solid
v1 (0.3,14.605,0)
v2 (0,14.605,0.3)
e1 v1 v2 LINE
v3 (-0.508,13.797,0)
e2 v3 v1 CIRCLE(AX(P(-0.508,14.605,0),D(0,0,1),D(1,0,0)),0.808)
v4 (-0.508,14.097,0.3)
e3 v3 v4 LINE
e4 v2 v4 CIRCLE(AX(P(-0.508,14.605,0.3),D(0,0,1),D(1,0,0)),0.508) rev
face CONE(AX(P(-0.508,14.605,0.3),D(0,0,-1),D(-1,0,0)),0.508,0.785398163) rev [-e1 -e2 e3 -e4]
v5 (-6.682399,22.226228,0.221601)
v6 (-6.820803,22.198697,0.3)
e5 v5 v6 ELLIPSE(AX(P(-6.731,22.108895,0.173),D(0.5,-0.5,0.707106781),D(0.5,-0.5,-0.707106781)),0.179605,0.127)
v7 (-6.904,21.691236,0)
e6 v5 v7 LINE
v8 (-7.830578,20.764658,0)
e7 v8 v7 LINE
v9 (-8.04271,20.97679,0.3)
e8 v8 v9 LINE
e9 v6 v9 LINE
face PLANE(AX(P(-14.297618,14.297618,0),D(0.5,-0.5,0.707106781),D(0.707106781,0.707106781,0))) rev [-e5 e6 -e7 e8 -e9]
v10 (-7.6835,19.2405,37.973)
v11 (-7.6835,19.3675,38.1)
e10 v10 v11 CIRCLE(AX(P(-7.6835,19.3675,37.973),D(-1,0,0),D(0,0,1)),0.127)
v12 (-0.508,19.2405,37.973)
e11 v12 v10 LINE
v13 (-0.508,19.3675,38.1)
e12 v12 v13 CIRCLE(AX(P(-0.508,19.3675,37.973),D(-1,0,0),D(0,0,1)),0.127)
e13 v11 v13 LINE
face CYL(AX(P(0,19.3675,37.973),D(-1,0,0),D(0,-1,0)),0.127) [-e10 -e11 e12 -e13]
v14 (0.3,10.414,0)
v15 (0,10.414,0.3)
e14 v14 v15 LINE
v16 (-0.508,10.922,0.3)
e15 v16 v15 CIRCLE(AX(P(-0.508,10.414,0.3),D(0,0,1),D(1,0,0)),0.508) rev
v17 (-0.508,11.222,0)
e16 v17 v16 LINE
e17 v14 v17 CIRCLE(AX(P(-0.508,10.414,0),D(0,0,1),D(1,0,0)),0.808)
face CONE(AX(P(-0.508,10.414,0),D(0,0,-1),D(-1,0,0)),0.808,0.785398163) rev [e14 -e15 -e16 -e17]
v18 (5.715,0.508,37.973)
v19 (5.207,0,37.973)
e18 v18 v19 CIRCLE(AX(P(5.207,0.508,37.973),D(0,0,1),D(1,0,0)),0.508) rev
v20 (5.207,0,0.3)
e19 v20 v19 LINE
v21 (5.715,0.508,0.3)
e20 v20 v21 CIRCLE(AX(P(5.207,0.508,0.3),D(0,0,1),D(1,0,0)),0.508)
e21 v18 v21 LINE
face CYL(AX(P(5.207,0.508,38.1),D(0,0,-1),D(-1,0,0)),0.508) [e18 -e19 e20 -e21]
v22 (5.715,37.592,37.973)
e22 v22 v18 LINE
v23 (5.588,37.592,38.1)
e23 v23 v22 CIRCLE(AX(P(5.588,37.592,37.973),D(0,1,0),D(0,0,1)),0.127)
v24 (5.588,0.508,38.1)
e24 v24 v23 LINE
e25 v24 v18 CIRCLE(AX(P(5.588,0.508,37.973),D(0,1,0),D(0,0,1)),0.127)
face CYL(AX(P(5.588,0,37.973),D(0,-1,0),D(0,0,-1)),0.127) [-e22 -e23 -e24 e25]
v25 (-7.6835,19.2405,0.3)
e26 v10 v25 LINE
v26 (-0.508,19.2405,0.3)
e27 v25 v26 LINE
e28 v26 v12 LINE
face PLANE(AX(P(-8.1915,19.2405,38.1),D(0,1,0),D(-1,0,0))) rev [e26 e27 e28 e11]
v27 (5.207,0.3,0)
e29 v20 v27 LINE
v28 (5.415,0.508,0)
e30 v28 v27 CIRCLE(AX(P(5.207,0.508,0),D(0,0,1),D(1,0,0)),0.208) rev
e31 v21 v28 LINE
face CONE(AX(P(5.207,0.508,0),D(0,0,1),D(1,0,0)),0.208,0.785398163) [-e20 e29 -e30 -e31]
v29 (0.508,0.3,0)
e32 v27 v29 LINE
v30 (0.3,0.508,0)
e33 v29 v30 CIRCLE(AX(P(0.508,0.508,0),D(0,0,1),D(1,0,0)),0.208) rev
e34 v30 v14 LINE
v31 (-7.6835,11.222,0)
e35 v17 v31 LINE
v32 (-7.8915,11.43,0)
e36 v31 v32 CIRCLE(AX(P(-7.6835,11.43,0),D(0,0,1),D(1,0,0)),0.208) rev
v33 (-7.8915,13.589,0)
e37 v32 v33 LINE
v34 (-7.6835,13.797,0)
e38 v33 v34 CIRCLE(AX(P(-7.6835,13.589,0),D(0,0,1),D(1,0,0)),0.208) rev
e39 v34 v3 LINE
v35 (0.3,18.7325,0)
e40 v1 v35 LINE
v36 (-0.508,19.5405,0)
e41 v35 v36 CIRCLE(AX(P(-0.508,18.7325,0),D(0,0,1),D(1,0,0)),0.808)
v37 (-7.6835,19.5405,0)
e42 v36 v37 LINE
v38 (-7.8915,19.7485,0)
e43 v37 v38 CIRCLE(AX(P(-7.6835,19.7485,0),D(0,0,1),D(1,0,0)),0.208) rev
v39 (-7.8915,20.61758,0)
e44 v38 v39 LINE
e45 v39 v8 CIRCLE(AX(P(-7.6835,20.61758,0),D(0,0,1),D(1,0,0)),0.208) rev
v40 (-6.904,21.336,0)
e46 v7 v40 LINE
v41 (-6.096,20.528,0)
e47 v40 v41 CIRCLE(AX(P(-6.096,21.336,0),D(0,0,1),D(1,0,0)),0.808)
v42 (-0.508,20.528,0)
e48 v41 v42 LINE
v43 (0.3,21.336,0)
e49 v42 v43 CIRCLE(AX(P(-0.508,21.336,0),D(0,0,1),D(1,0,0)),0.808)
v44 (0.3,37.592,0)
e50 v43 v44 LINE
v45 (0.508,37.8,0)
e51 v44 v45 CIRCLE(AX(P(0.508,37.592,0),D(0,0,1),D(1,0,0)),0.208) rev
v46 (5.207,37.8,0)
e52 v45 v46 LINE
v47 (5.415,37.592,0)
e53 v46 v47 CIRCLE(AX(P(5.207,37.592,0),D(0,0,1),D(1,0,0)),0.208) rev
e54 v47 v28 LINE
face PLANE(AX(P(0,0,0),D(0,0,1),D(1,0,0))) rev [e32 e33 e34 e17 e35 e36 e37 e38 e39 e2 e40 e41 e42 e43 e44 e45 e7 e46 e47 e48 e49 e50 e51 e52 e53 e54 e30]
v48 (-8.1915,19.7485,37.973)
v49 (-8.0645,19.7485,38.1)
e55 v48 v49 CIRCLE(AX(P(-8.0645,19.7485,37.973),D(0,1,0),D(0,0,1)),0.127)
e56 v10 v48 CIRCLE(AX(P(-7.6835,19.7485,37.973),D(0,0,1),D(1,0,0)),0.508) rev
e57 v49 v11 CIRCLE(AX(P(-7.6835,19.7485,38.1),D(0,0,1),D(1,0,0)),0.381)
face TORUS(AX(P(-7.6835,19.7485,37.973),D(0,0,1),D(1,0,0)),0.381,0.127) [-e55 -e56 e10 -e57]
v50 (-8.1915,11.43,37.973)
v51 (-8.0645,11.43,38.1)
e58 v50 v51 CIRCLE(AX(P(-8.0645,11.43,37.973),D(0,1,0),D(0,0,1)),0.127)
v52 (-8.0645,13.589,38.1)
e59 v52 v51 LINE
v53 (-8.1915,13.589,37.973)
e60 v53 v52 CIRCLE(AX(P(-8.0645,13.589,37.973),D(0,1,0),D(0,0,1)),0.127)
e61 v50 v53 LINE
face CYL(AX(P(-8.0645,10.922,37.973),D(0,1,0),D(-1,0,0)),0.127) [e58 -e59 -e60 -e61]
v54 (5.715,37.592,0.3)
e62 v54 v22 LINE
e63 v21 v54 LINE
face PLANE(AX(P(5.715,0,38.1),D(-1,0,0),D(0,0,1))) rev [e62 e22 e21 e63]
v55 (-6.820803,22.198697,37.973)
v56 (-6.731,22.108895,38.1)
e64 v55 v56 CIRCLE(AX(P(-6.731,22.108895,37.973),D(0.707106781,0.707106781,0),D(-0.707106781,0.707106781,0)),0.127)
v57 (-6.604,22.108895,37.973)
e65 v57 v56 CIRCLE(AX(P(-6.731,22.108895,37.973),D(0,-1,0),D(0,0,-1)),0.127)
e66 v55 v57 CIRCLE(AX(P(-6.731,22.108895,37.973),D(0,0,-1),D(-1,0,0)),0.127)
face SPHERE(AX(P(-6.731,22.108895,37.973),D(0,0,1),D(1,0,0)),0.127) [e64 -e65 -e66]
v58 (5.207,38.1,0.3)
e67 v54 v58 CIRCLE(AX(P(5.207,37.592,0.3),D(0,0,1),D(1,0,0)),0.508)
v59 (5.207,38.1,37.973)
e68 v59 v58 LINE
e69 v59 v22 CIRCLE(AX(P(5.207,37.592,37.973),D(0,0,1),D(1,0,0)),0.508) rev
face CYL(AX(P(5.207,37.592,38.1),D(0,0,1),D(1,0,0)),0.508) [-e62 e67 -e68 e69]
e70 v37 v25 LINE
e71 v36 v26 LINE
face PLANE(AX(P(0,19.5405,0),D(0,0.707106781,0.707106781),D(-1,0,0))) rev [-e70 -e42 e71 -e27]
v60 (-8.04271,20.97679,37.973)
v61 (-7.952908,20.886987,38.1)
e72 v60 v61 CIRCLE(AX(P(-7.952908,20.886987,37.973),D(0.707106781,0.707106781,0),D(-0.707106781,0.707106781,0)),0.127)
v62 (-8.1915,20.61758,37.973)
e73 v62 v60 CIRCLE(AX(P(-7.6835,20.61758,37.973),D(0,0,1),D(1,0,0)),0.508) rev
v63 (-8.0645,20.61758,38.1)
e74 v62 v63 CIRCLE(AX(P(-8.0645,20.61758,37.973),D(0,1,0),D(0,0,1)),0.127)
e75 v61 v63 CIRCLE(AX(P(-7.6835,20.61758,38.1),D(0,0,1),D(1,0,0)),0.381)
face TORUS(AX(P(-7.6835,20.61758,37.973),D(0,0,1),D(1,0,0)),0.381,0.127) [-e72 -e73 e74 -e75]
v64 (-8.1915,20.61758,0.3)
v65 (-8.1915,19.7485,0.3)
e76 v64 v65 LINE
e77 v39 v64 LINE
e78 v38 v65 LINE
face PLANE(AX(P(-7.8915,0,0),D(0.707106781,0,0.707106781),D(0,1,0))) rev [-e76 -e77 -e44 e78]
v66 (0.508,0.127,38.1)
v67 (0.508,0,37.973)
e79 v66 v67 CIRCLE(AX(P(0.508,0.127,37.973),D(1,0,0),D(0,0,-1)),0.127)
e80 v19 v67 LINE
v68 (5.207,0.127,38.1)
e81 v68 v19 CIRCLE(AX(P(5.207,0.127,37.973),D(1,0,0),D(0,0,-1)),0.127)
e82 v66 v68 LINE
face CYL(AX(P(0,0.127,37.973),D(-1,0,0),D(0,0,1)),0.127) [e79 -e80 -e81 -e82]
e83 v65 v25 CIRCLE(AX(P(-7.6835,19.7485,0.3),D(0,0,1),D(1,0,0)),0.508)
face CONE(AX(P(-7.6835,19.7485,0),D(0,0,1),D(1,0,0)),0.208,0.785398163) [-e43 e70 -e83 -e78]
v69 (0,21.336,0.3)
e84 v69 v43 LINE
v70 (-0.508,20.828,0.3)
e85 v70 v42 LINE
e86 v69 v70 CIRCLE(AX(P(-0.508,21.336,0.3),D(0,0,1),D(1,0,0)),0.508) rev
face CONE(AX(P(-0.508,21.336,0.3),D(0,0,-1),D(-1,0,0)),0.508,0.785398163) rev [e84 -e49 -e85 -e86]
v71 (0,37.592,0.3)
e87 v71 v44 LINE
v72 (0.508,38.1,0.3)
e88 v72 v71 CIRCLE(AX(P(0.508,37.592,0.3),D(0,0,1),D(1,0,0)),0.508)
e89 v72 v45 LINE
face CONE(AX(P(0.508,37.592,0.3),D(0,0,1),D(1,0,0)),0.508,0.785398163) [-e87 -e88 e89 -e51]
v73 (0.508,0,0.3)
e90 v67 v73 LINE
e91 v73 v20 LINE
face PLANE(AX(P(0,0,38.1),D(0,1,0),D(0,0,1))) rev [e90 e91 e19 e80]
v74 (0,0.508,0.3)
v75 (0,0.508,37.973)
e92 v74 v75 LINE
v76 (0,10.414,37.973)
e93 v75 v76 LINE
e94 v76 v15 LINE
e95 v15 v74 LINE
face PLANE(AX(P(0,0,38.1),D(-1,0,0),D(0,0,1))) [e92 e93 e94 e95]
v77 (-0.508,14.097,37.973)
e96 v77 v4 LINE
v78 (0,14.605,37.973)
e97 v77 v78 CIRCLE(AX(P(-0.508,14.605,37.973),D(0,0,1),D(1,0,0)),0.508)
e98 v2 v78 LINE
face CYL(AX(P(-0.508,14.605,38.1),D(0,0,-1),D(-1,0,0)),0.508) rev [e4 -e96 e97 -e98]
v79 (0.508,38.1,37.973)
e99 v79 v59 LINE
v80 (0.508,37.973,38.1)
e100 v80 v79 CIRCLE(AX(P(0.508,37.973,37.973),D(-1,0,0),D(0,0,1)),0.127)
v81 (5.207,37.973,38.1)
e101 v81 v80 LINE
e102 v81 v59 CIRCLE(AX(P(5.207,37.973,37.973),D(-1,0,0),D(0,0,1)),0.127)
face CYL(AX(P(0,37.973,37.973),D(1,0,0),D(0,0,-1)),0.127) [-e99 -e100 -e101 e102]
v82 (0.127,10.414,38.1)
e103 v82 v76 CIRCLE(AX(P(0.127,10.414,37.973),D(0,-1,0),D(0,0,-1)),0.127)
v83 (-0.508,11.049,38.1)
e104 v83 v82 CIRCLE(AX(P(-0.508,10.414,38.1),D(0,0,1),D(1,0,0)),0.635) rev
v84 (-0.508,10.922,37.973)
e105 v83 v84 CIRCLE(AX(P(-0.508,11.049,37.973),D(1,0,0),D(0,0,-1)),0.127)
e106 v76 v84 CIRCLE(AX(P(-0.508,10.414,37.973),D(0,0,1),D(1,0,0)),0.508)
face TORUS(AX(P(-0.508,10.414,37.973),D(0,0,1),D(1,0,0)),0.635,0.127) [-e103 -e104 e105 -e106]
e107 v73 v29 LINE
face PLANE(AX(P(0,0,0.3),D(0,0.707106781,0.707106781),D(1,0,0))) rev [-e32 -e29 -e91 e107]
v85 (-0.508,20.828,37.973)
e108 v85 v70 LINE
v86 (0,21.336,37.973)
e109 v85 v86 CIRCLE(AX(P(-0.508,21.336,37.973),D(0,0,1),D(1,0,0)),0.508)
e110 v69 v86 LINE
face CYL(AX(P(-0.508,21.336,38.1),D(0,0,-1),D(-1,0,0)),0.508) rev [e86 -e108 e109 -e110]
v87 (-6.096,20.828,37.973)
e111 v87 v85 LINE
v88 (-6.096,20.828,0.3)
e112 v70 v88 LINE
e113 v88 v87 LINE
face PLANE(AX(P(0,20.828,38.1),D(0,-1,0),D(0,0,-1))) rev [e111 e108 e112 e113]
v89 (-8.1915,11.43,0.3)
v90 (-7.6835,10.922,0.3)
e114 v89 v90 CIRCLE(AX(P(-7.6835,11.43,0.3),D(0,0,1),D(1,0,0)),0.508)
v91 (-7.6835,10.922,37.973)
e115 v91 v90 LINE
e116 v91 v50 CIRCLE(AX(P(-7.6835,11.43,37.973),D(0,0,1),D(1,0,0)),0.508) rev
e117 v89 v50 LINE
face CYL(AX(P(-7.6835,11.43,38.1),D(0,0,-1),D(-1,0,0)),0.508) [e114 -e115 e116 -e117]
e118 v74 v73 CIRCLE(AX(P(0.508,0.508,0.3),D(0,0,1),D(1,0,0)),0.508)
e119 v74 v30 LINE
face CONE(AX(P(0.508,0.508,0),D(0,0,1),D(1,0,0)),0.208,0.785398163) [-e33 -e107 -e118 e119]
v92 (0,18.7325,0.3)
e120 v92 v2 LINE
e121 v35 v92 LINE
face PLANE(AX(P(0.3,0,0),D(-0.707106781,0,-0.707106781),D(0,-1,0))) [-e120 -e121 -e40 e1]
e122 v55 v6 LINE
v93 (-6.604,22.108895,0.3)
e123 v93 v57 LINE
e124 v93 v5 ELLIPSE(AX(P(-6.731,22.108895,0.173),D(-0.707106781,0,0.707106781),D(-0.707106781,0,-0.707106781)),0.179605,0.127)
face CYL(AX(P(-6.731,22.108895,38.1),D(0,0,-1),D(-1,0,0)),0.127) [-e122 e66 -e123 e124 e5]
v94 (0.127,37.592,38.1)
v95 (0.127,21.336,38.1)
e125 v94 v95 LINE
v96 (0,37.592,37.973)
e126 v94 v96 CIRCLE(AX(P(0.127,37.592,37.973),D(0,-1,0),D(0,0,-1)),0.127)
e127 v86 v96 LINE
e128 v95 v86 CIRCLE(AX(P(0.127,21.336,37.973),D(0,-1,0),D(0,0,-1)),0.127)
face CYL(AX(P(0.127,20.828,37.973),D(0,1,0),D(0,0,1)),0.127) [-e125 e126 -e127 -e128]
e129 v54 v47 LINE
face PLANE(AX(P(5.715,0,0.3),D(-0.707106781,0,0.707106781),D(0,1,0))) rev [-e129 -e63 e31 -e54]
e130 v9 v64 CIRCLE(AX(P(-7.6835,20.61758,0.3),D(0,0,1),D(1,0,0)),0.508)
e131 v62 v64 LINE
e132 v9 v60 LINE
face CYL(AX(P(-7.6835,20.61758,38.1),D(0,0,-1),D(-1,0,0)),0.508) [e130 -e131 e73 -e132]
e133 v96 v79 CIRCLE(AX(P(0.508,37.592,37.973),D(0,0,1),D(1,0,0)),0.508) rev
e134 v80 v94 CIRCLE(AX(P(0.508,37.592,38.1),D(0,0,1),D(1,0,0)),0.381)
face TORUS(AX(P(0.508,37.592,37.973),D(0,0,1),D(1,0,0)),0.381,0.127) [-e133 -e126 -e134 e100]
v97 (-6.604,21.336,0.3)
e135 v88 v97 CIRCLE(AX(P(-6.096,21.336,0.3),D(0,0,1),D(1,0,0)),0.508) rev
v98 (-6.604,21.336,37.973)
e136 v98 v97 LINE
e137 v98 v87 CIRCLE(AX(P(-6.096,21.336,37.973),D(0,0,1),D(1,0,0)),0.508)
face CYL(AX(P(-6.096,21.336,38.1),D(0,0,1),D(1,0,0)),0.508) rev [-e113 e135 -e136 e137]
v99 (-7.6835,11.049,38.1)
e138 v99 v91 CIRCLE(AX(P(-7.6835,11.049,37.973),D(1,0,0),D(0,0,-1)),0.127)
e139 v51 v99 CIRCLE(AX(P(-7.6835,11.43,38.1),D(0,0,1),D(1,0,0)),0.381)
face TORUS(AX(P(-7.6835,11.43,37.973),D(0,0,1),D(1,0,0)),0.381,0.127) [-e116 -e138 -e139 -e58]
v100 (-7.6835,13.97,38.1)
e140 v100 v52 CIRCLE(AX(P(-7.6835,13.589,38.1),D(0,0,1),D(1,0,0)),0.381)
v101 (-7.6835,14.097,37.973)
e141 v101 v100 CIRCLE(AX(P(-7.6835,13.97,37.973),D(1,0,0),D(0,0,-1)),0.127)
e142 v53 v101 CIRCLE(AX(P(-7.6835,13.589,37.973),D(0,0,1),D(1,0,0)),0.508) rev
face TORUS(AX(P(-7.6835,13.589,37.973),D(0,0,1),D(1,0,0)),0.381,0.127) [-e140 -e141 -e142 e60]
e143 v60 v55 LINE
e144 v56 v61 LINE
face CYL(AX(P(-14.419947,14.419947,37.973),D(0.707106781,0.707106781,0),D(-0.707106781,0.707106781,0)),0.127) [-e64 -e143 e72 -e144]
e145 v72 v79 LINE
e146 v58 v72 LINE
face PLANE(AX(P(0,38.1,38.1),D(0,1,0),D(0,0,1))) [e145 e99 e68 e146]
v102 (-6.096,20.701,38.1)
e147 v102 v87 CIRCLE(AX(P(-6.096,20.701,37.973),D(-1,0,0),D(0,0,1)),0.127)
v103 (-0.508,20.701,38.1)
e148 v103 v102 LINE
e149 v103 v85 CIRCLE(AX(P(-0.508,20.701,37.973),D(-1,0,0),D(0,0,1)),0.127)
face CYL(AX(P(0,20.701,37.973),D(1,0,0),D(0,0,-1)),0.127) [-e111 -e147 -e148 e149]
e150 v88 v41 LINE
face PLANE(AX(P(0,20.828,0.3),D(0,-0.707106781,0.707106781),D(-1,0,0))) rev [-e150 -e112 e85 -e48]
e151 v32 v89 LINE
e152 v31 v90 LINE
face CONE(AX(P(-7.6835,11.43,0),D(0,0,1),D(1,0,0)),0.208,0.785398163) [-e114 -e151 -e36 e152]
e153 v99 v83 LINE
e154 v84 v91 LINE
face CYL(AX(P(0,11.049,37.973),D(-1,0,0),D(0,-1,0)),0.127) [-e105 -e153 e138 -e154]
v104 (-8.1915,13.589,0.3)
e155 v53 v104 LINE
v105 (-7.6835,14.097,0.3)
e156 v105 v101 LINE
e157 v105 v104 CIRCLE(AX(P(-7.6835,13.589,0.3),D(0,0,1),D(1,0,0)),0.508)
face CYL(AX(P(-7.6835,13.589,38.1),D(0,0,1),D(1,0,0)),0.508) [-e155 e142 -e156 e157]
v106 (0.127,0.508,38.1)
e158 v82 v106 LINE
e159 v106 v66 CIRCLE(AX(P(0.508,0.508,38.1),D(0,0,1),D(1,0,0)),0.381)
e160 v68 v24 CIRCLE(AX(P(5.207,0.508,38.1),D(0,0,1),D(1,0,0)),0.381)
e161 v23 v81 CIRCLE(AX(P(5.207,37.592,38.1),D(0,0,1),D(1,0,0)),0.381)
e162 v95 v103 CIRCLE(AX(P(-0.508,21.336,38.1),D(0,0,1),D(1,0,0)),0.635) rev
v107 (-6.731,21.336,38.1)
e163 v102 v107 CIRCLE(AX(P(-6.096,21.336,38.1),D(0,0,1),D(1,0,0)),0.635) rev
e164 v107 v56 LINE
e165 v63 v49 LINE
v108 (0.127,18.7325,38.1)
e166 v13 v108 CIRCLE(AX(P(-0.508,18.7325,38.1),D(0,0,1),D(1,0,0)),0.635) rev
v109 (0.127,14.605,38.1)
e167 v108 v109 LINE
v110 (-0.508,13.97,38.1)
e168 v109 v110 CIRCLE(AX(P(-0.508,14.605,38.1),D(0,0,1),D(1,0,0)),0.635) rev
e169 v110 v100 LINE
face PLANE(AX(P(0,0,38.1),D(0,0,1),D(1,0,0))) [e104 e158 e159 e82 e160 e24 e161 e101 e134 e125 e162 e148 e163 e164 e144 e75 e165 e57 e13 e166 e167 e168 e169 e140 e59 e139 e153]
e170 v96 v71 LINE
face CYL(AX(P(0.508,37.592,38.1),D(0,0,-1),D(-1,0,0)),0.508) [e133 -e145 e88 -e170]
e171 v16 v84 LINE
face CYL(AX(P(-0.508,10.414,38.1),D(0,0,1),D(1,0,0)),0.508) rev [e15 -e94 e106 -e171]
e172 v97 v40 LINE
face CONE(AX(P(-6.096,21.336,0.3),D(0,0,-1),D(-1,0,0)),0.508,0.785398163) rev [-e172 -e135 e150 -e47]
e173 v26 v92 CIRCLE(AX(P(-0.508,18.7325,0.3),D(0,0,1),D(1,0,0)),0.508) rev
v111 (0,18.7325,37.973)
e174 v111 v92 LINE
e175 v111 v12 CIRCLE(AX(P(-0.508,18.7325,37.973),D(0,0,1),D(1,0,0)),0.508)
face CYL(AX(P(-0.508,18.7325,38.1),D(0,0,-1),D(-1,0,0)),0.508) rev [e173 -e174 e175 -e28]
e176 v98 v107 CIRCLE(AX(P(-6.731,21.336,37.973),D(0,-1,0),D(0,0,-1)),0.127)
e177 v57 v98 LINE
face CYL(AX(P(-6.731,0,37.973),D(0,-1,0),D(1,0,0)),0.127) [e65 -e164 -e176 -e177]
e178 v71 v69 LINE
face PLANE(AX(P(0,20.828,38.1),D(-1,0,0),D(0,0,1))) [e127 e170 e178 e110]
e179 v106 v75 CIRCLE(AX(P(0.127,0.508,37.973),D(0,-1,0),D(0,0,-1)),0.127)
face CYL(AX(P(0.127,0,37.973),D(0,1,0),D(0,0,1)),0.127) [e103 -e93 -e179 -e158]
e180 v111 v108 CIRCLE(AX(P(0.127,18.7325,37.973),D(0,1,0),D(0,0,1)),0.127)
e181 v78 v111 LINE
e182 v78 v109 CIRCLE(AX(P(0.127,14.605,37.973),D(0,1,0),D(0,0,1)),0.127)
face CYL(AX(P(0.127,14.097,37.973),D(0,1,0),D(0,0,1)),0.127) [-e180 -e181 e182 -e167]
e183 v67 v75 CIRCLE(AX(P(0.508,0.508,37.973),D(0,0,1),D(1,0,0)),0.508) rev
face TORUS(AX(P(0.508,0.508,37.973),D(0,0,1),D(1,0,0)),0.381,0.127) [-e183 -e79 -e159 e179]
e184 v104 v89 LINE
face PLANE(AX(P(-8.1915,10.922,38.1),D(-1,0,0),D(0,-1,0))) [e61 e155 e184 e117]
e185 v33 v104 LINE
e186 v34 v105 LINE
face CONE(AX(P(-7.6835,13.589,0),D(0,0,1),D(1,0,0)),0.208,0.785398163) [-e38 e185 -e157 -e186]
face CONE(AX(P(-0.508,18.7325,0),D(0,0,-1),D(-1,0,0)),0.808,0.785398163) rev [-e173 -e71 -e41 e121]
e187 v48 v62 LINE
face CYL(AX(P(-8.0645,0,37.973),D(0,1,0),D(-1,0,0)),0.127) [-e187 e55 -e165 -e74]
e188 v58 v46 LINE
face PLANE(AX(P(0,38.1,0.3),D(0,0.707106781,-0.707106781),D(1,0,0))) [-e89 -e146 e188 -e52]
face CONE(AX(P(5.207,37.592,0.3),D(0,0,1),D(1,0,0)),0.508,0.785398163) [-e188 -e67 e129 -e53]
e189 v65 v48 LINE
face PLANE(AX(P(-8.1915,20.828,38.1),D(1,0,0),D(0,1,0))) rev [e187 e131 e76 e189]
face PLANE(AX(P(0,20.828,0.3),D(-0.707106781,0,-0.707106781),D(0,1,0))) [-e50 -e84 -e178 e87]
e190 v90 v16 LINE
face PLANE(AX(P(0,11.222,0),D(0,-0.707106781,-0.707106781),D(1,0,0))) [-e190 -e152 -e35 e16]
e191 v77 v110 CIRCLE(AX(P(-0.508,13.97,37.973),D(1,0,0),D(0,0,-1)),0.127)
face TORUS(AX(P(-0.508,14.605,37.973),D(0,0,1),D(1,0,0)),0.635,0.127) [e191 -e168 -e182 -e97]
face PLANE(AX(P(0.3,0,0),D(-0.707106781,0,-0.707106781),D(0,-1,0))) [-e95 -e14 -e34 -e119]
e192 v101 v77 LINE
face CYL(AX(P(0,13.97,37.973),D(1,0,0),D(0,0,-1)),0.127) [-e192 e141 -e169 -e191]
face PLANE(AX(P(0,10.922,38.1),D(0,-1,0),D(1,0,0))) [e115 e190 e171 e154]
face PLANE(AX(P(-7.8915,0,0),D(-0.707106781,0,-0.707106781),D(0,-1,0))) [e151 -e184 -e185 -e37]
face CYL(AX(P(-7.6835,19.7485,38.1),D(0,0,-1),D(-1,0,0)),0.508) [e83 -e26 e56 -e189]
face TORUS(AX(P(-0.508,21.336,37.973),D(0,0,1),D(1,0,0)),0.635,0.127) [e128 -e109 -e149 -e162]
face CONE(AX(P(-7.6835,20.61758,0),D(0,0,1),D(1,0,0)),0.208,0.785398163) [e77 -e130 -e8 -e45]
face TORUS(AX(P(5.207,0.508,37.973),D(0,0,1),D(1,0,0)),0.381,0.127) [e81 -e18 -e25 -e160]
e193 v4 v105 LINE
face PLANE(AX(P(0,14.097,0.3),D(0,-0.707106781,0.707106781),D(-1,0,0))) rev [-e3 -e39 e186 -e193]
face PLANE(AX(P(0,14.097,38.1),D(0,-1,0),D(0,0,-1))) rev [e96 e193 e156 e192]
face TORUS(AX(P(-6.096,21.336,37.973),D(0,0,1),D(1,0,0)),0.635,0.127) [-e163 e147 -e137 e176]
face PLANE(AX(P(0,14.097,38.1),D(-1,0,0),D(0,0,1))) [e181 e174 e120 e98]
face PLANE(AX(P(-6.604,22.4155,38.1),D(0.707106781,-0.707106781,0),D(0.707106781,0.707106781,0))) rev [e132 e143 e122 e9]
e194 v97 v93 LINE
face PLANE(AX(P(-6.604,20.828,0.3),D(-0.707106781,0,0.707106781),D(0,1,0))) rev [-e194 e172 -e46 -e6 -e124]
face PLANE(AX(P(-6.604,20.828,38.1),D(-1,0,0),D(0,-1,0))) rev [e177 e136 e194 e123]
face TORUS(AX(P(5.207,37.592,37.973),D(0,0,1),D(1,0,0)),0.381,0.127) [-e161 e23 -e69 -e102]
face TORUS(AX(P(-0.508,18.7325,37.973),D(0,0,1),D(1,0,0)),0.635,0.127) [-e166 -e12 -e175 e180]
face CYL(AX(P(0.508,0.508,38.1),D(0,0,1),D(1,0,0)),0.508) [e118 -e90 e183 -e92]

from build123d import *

# Parameters (mm, degrees)
BOSS_EXTRUDE1_DEPTH = 38.1
FILLET1_R           = 0.508
FILLET2_R           = 0.127
CHAMFER1_SIZE       = 0.3
FILLET3_R           = 0.127


with BuildPart() as part:
    # Sketch1 → Boss-Extrude1 (new body)
    with BuildSketch(Plane.XY):
        Polygon((0, 0), (5.715, 0), (5.715, 38.1), (0, 38.1), (0, 20.828), (-6.604, 20.828), (-6.604, 22.4155), (-8.1915, 20.828), (-8.1915, 19.2405), (0, 19.2405), (0, 14.097), (-8.1915, 14.097), (-8.1915, 10.922), (0, 10.922), align=None)
    extrude(amount=BOSS_EXTRUDE1_DEPTH)

    # Fillet1
    fillet1_edges = [part.edges().sort_by_distance(p)[0] for p in [
        (0, 0, 19.05),
        (0, 10.922, 19.05),
        (-8.1915, 10.922, 19.05),
        (-8.1915, 14.097, 19.05),
        (0, 14.097, 19.05),
        (0, 19.2405, 19.05),
        (-8.1915, 19.2405, 19.05),
        (-8.1915, 20.828, 19.05),
        (-6.604, 20.828, 19.05),
        (0, 20.828, 19.05),
        (0, 38.1, 19.05),
        (5.715, 38.1, 19.05),
        (5.715, 0, 19.05),
    ]]
    fillet(fillet1_edges, radius=FILLET1_R)

    # Fillet2
    fillet2_edges = [part.edges().sort_by_distance(p)[0] for p in [
        (-6.604, 22.4155, 19.05),
    ]]
    fillet(fillet2_edges, radius=FILLET2_R)

    # Chamfer1
    # the kernel refuses this chamfer: 0.3 mm, written as the material it takes off along each edge
    with BuildSketch(Plane(origin=(-6.275266217, 22.744233783, 0), x_dir=(0.7068394360706772, -0.7068394360706697, -0.02749587661058634), z_dir=(-0.7071067811865438, -0.7071067811865513, 0))) as chamfer1_piece_1:
        Polygon((CHAMFER1_SIZE * 0.999621916911, CHAMFER1_SIZE * 0.0274958766106), (-CHAMFER1_SIZE * 0.0274958766106, CHAMFER1_SIZE * 0.999621916911), (0, 0), align=None)
    extrude(amount=2.499543315, mode=Mode.SUBTRACT)
    with BuildSketch(Plane(origin=(-7.6835, 19.2405, 0), x_dir=(0, 0.9996219169112968, -0.02749587661058633), z_dir=(1, 0, 0)), Plane(origin=(-7.6835, 10.922, 0), x_dir=(0, 0.9996219169112968, -0.02749587661058633), z_dir=(1, 0, 0)), Plane(origin=(-0.508, 14.097, 0), x_dir=(0, -0.9996219169112968, -0.02749587661058633), z_dir=(-1, 0, 0))) as chamfer1_piece_2:
        Polygon((CHAMFER1_SIZE * 0.999621916911, CHAMFER1_SIZE * 0.0274958766106), (-CHAMFER1_SIZE * 0.0274958766106, CHAMFER1_SIZE * 0.999621916911), (0, 0), align=None)
    extrude(amount=7.1755, mode=Mode.SUBTRACT)
    with BuildSketch(Plane(origin=(0.508, 0, 0), x_dir=(0, 0.9996219169112968, -0.027495876610586275), z_dir=(1, 0, 0)), Plane(origin=(5.207, 38.1, 0), x_dir=(0, -0.9996219169112968, -0.027495876610586494), z_dir=(-1, 0, 0))) as chamfer1_piece_3:
        Polygon((CHAMFER1_SIZE * 0.999621916911, CHAMFER1_SIZE * 0.0274958766106), (-CHAMFER1_SIZE * 0.0274958766106, CHAMFER1_SIZE * 0.999621916911), (0, 0), align=None)
    extrude(amount=4.699, mode=Mode.SUBTRACT)
    with BuildSketch(Plane(origin=(0, 10.414, 0), x_dir=(0.9996219169112968, 0, -0.02749587661058637), z_dir=(0, -1, 0))) as chamfer1_piece_4:
        Polygon((CHAMFER1_SIZE * 0.999621916911, CHAMFER1_SIZE * 0.0274958766106), (-CHAMFER1_SIZE * 0.0274958766106, CHAMFER1_SIZE * 0.999621916911), (0, 0), align=None)
    extrude(amount=9.906, mode=Mode.SUBTRACT)
    with BuildSketch(Plane(origin=(-8.1915, 13.589, 0), x_dir=(0.9996219169112968, 0, -0.02749587661058637), z_dir=(0, -1, 0))) as chamfer1_piece_5:
        Polygon((CHAMFER1_SIZE * 0.999621916911, CHAMFER1_SIZE * 0.0274958766106), (-CHAMFER1_SIZE * 0.0274958766106, CHAMFER1_SIZE * 0.999621916911), (0, 0), align=None)
    extrude(amount=2.159, mode=Mode.SUBTRACT)
    with BuildSketch(Plane(origin=(0, 18.7325, 0), x_dir=(0.9996219169112968, 0, -0.02749587661058637), z_dir=(0, -1, 0))) as chamfer1_piece_6:
        Polygon((CHAMFER1_SIZE * 0.999621916911, CHAMFER1_SIZE * 0.0274958766106), (-CHAMFER1_SIZE * 0.0274958766106, CHAMFER1_SIZE * 0.999621916911), (0, 0), align=None)
    extrude(amount=4.1275, mode=Mode.SUBTRACT)
    with BuildSketch(Plane(origin=(-8.1915, 20.61757951, 0), x_dir=(0.9996219169112968, 1.118541876484896e-15, -0.02749587661058637), z_dir=(0, -1, 0))) as chamfer1_piece_7:
        Polygon((CHAMFER1_SIZE * 0.999621916911, CHAMFER1_SIZE * 0.0274958766106), (-CHAMFER1_SIZE * 0.0274958766106, CHAMFER1_SIZE * 0.999621916911), (0, 0), align=None)
    extrude(amount=0.86907951, mode=Mode.SUBTRACT)
    with BuildSketch(Plane(origin=(-6.604, 21.336, 0), x_dir=(-0.9996219169112968, 0, -0.02749587661058637), z_dir=(0, 1, 0))) as chamfer1_piece_8:
        Polygon((CHAMFER1_SIZE * 0.999621916911, CHAMFER1_SIZE * 0.0274958766106), (-CHAMFER1_SIZE * 0.0274958766106, CHAMFER1_SIZE * 0.999621916911), (0, 0), align=None)
    extrude(amount=1.544399774, mode=Mode.SUBTRACT)
    with BuildSketch(Plane(origin=(-0.508, 20.828, 0), x_dir=(0, -0.9996219169112968, -0.02749587661058633), z_dir=(-1, 0, 0))) as chamfer1_piece_9:
        Polygon((CHAMFER1_SIZE * 0.999621916911, CHAMFER1_SIZE * 0.0274958766106), (-CHAMFER1_SIZE * 0.0274958766106, CHAMFER1_SIZE * 0.999621916911), (0, 0), align=None)
    extrude(amount=5.588, mode=Mode.SUBTRACT)
    with BuildSketch(Plane(origin=(0, 37.592, 0), x_dir=(0.9996219169112968, 0, -0.02749587661058637), z_dir=(0, -1, 0))) as chamfer1_piece_10:
        Polygon((CHAMFER1_SIZE * 0.999621916911, CHAMFER1_SIZE * 0.0274958766106), (-CHAMFER1_SIZE * 0.0274958766106, CHAMFER1_SIZE * 0.999621916911), (0, 0), align=None)
    extrude(amount=16.256, mode=Mode.SUBTRACT)
    with BuildSketch(Plane(origin=(5.715, 0.508, 0), x_dir=(-0.9996219169112968, 0, -0.02749587661058637), z_dir=(0, 1, 0))) as chamfer1_piece_11:
        Polygon((CHAMFER1_SIZE * 0.999621916911, CHAMFER1_SIZE * 0.0274958766106), (-CHAMFER1_SIZE * 0.0274958766106, CHAMFER1_SIZE * 0.999621916911), (0, 0), align=None)
    extrude(amount=37.084, mode=Mode.SUBTRACT)
    with BuildSketch(Plane(origin=(-7.6835, 13.589, 0), x_dir=(0, 1, 0), z_dir=(1, 0, 0))) as chamfer1_piece_12:
        Polygon((0.508 - CHAMFER1_SIZE, 0), (0.508, CHAMFER1_SIZE), (0.508, 0), align=None)
    revolve(axis=Axis((-7.6835, 13.589, 0), (0, 0, 1)), revolution_arc=90, mode=Mode.SUBTRACT)
    with BuildSketch(Plane(origin=(-7.6835, 11.43, 0), x_dir=(-1, 0, 0), z_dir=(0, 1, 0))) as chamfer1_piece_13:
        Polygon((0.508 - CHAMFER1_SIZE, 0), (0.508, CHAMFER1_SIZE), (0.508, 0), align=None)
    revolve(axis=Axis((-7.6835, 11.43, 0), (0, 0, 1)), revolution_arc=90, mode=Mode.SUBTRACT)
    with BuildSketch(Plane(origin=(0.508, 0.508, 0), x_dir=(0, -1, 0), z_dir=(1, 0, 0))) as chamfer1_piece_14:
        Polygon((0.508 - CHAMFER1_SIZE, 0), (0.508, -CHAMFER1_SIZE), (0.508, 0), align=None)
    revolve(axis=Axis((0.508, 0.508, 0), (0, 0, -1)), revolution_arc=90, mode=Mode.SUBTRACT)
    with BuildSketch(Plane(origin=(0.508, 37.592, 0), x_dir=(0, 1, 0), z_dir=(1, 0, 0))) as chamfer1_piece_15:
        Polygon((0.508 - CHAMFER1_SIZE, 0), (0.508, CHAMFER1_SIZE), (0.508, 0), align=None)
    revolve(axis=Axis((0.508, 37.592, 0), (0, 0, 1)), revolution_arc=90, mode=Mode.SUBTRACT)
    with BuildSketch(Plane(origin=(5.207, 0.508, 0), x_dir=(0, -1, 0), z_dir=(-1, 0, 0))) as chamfer1_piece_16:
        Polygon((0.508 - CHAMFER1_SIZE, 0), (0.508, CHAMFER1_SIZE), (0.508, 0), align=None)
    revolve(axis=Axis((5.207, 0.508, 0), (0, 0, 1)), revolution_arc=90, mode=Mode.SUBTRACT)
    with BuildSketch(Plane(origin=(5.207, 37.592, 0), x_dir=(1, 0, 0), z_dir=(0, -1, 0))) as chamfer1_piece_17:
        Polygon((0.508 - CHAMFER1_SIZE, 0), (0.508, CHAMFER1_SIZE), (0.508, 0), align=None)
    revolve(axis=Axis((5.207, 37.592, 0), (0, 0, 1)), revolution_arc=90, mode=Mode.SUBTRACT)
    with BuildSketch(Plane(origin=(-7.6835, 20.61757951, 0), x_dir=(-0.7071067811865519, 0.7071067811865432, 0), z_dir=(0.7071067811865432, 0.7071067811865519, 0))) as chamfer1_piece_18:
        Polygon((0.508 - CHAMFER1_SIZE, 0), (0.508, CHAMFER1_SIZE), (0.508, 0), align=None)
    revolve(axis=Axis((-7.6835, 20.61757951, 0), (0, 0, 1)), revolution_arc=45, mode=Mode.SUBTRACT)
    with BuildSketch(Plane(origin=(-7.6835, 19.7485, 0), x_dir=(-1, 0, 0), z_dir=(0, 1, 0))) as chamfer1_piece_19:
        Polygon((0.508 - CHAMFER1_SIZE, 0), (0.508, CHAMFER1_SIZE), (0.508, 0), align=None)
    revolve(axis=Axis((-7.6835, 19.7485, 0), (0, 0, 1)), revolution_arc=90, mode=Mode.SUBTRACT)
    with BuildSketch(Plane(origin=(-0.508, 14.605, 0), x_dir=(1, 0, 0), z_dir=(0, 1, 0))) as chamfer1_piece_20:
        Polygon((0.508 + CHAMFER1_SIZE, 0), (0.508, -CHAMFER1_SIZE), (0.508, 0), align=None)
    revolve(axis=Axis((-0.508, 14.605, 0), (0, 0, -1)), revolution_arc=90, mode=Mode.SUBTRACT)
    with BuildSketch(Plane(origin=(-0.508, 18.7325, 0), x_dir=(0, 1, 0), z_dir=(-1, 0, 0))) as chamfer1_piece_21:
        Polygon((0.508 + CHAMFER1_SIZE, 0), (0.508, -CHAMFER1_SIZE), (0.508, 0), align=None)
    revolve(axis=Axis((-0.508, 18.7325, 0), (0, 0, -1)), revolution_arc=90, mode=Mode.SUBTRACT)
    with BuildSketch(Plane(origin=(-0.508, 10.414, 0), x_dir=(0, 1, 0), z_dir=(-1, 0, 0))) as chamfer1_piece_22:
        Polygon((0.508 + CHAMFER1_SIZE, 0), (0.508, -CHAMFER1_SIZE), (0.508, 0), align=None)
    revolve(axis=Axis((-0.508, 10.414, 0), (0, 0, -1)), revolution_arc=90, mode=Mode.SUBTRACT)
    with BuildSketch(Plane(origin=(-6.096, 21.336, 0), x_dir=(0, -1, 0), z_dir=(1, 0, 0))) as chamfer1_piece_23:
        Polygon((0.508 + CHAMFER1_SIZE, 0), (0.508, -CHAMFER1_SIZE), (0.508, 0), align=None)
    revolve(axis=Axis((-6.096, 21.336, 0), (0, 0, -1)), revolution_arc=90, mode=Mode.SUBTRACT)
    with BuildSketch(Plane(origin=(-0.508, 21.336, 0), x_dir=(1, 0, 0), z_dir=(0, 1, 0))) as chamfer1_piece_24:
        Polygon((0.508 + CHAMFER1_SIZE, 0), (0.508, -CHAMFER1_SIZE), (0.508, 0), align=None)
    revolve(axis=Axis((-0.508, 21.336, 0), (0, 0, -1)), revolution_arc=90, mode=Mode.SUBTRACT)

    # Fillet3
    fillet3_edges = [part.edges().sort_by_distance(p)[0] for p in [
        (-7.431756403, 21.587743597, 38.1),
        (-6.682399204, 22.226227578, 38.1),
        (-4.09575, 19.2405, 38.1),
        (-8.1915, 20.183039755, 38.1),
        (2.8575, 0, 38.1),
        (5.715, 19.05, 38.1),
        (2.8575, 38.1, 38.1),
        (0, 29.464, 38.1),
        (-3.302, 20.828, 38.1),
        (-6.604, 21.722447439, 38.1),
        (0, 16.66875, 38.1),
        (-4.09575, 14.097, 38.1),
        (-8.1915, 12.5095, 38.1),
        (-4.09575, 10.922, 38.1),
        (0, 5.461, 38.1),
        (-8.042710245, 13.948210245, 38.1),
        (-8.042710245, 11.070789755, 38.1),
        (0.148789755, 0.148789755, 38.1),
        (0.148789755, 37.951210245, 38.1),
        (5.566210245, 0.148789755, 38.1),
        (5.566210245, 37.951210245, 38.1),
        (-8.152830803, 20.811982694, 38.1),
        (-8.042710245, 19.389289755, 38.1),
        (-0.148789755, 14.245789755, 38.1),
        (-0.148789755, 19.091710245, 38.1),
        (-0.148789755, 10.773210245, 38.1),
        (-6.455210245, 20.976789755, 38.1),
        (-0.148789755, 20.976789755, 38.1),
    ]]
    fillet(fillet3_edges, radius=FILLET3_R)


solid = part.part
